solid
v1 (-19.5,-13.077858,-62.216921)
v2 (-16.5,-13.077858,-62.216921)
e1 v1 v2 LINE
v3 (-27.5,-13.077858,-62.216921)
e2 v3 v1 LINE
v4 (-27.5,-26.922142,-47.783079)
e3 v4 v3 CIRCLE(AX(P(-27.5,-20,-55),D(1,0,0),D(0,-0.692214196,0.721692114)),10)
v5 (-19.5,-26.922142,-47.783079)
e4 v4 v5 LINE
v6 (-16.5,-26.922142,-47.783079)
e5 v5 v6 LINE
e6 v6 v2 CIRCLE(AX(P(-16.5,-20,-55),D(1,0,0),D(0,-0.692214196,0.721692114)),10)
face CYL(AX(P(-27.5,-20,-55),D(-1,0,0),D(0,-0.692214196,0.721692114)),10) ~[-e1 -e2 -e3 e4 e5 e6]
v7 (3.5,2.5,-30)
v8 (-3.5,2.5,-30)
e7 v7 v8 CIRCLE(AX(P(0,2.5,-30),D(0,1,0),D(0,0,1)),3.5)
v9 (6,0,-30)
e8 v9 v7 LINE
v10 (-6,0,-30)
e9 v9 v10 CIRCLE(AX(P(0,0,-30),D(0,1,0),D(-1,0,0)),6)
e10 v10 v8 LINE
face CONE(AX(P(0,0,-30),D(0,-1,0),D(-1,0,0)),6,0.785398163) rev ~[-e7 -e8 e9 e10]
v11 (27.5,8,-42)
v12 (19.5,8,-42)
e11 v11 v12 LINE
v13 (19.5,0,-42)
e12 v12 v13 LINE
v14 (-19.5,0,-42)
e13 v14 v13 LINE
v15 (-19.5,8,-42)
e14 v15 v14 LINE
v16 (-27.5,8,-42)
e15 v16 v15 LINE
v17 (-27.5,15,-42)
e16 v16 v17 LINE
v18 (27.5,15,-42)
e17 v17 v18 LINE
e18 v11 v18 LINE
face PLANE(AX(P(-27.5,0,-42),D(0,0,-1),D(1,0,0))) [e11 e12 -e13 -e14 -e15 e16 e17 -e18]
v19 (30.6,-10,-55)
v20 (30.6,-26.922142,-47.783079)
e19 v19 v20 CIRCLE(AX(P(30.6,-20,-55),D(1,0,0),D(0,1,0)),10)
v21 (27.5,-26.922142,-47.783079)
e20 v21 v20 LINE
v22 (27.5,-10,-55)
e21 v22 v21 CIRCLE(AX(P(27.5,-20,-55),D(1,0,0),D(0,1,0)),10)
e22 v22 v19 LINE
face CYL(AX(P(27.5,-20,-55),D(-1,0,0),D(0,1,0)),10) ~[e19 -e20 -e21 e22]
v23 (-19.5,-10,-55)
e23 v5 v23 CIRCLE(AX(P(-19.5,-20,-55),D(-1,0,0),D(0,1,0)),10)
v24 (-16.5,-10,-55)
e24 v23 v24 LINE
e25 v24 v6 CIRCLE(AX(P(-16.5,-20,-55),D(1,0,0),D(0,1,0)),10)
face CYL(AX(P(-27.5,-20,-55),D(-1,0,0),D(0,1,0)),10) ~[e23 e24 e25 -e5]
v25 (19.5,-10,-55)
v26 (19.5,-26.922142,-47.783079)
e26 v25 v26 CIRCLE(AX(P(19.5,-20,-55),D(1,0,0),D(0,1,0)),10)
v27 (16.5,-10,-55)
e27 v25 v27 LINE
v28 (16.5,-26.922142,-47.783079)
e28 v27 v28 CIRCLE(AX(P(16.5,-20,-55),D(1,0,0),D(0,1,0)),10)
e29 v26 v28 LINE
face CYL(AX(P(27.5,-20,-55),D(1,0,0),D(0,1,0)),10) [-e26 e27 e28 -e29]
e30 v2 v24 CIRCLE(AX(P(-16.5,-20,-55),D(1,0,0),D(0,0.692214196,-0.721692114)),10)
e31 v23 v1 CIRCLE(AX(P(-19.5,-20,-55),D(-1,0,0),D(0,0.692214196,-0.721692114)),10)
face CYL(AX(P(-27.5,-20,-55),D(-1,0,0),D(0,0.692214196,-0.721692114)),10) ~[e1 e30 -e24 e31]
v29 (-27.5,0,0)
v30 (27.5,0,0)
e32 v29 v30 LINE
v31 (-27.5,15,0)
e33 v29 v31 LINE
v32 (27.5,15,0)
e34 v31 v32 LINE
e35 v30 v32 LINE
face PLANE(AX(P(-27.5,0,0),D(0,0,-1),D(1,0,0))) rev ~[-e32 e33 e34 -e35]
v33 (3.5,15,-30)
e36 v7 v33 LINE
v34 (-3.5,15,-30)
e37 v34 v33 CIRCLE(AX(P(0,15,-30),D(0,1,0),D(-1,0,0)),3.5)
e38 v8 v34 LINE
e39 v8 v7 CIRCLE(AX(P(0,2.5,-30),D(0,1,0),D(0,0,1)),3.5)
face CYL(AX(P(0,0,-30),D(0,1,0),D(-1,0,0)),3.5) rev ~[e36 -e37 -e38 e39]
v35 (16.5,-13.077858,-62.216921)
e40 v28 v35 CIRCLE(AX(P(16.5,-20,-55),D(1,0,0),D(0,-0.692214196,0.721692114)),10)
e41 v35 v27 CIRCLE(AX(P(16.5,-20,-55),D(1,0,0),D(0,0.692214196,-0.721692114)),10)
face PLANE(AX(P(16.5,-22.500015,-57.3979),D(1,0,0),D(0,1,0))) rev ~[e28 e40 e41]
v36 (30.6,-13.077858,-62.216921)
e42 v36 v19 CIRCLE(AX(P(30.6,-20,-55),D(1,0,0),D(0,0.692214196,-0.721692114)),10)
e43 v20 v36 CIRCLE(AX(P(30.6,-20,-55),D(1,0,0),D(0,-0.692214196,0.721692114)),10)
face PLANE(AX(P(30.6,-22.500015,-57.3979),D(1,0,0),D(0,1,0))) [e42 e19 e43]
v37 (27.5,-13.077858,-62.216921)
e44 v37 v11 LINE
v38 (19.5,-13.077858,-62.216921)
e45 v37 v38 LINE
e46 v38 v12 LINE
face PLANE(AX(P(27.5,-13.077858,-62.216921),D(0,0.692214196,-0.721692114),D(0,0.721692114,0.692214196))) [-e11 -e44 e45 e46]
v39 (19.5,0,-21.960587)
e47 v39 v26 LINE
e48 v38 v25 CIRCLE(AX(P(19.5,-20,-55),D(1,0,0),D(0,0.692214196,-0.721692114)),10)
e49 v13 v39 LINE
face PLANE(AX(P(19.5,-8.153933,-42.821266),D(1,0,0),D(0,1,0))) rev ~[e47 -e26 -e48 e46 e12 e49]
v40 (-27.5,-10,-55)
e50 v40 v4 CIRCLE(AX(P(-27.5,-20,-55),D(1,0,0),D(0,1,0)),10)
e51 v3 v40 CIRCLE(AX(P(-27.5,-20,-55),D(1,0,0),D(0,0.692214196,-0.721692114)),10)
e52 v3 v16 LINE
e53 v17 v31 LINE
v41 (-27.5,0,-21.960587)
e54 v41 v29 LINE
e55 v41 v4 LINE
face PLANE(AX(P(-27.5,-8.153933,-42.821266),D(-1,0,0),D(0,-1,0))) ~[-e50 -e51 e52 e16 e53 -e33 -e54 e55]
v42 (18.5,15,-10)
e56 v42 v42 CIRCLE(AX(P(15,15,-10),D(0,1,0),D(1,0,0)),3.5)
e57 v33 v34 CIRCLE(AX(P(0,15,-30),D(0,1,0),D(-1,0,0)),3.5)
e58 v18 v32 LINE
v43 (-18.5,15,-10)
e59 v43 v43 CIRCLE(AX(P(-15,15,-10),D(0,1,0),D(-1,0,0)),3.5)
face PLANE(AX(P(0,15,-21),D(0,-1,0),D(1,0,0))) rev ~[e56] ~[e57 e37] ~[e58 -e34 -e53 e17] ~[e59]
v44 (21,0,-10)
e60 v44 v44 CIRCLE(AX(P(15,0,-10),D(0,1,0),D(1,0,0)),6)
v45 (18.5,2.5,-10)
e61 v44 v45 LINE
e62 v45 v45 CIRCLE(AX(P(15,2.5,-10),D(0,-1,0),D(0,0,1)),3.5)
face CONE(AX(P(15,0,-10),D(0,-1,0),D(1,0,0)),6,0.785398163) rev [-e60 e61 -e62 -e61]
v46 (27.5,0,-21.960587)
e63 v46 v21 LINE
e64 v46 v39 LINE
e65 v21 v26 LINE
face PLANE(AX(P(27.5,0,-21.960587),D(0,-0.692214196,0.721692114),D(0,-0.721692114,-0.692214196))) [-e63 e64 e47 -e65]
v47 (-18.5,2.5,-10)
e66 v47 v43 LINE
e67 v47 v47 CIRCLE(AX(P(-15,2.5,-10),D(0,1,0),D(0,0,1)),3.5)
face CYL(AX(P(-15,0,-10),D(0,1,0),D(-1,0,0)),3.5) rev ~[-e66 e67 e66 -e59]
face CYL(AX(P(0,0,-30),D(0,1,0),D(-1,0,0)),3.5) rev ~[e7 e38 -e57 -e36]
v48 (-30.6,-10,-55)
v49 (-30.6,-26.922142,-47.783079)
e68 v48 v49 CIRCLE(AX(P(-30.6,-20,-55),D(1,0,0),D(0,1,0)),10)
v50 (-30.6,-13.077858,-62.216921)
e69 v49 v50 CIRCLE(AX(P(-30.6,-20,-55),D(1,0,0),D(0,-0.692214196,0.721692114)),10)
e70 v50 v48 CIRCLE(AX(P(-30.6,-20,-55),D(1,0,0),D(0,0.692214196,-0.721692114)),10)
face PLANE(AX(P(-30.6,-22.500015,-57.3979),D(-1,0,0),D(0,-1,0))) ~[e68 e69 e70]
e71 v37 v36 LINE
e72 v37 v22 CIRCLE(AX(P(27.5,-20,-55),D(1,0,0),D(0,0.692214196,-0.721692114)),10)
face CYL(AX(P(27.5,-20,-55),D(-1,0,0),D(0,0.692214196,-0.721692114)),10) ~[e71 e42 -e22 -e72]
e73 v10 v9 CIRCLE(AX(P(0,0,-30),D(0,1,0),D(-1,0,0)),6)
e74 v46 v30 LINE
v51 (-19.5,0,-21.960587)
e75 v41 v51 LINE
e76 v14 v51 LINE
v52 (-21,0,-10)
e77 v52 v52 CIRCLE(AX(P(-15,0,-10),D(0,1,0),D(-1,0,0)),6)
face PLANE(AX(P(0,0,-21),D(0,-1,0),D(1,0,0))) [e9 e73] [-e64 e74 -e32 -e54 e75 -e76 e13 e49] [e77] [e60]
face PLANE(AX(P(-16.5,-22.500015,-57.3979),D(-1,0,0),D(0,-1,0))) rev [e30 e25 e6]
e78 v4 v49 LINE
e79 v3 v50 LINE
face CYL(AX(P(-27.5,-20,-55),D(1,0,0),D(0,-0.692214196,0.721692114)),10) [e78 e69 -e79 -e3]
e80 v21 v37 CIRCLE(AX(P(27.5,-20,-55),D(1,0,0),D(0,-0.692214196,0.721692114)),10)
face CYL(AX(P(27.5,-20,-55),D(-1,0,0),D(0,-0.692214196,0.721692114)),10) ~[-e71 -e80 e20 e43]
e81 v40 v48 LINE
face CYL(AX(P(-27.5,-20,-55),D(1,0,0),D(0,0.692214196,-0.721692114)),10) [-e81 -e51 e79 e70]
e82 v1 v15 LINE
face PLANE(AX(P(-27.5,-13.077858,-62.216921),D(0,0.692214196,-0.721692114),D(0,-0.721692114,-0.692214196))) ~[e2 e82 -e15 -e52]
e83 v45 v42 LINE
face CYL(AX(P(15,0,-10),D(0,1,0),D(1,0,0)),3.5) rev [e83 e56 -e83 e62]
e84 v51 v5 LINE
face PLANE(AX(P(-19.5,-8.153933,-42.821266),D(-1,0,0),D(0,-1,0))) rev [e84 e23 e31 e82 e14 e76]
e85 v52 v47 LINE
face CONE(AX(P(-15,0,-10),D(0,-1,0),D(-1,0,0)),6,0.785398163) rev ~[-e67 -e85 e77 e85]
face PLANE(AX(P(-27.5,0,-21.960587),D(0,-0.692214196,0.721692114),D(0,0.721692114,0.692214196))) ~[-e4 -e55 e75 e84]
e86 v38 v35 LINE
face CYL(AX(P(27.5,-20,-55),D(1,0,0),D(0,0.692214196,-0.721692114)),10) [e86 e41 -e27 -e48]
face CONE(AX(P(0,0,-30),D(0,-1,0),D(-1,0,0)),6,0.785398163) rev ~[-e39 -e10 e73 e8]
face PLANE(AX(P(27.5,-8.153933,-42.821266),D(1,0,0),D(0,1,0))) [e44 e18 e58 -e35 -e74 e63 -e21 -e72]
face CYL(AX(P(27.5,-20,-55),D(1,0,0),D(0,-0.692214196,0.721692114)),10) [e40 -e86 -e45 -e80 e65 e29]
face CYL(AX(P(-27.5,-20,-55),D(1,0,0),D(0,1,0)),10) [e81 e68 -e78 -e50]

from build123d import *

# Parameters (mm, degrees)
F0_W           = 55
F0_H           = 42
F1_DEPTH       = 15
F3_DEPTH       = 8
F4_DEPTH       = 3.1
F4_DEPTH_BACK  = 11
F6_D           = 7
F6_CSINK_D     = 12
F6_CSINK_ANGLE = 90


# Not quite as in the source:
# - a pattern or mirror of a feature is missing from the dataset's text; its kind, count and spacing are read off the source's solid


with BuildPart() as f1:
    # F0 (on Front) → F1 (new body)
    with BuildSketch(Plane.XZ):
        with Locations((0, -21)):
            Rectangle(F0_W, F0_H)
    extrude(amount=-F1_DEPTH)

    # F2 (on face) → F3 (join)
    with BuildSketch(Plane.YZ.offset(27.5)):
        with BuildLine():
            Line((0, -42), (0, -21.960586854))
            Line((0, -21.960586854), (-26.9221419573, -47.7830788612))
            ThreePointArc((-26.9221419573, -47.7830788612), (-16.0770814164, -45.8015919972), (-10, -55))
            ThreePointArc((-10, -55), (-10.8015919972, -58.9229185836), (-13.0778580427, -62.2169211388))
            Line((-13.0778580427, -62.2169211388), (8, -42))
            Line((8, -42), (0, -42))
        make_face()
        with BuildLine():
            ThreePointArc((-10, -55), (-16.0770814164, -45.8015919972), (-26.9221419573, -47.7830788612))
            Line((-26.9221419573, -47.7830788612), (-13.0778580427, -62.2169211388))
            ThreePointArc((-13.0778580427, -62.2169211388), (-10.8015919972, -58.9229185836), (-10, -55))
        make_face()
    f3 = extrude(amount=-F3_DEPTH)

    # F3_copies: F3 across plane
    add(f3.mirror(Plane(origin=(0, 0, 0), x_dir=(0, 0, -1), z_dir=(-1, 0, 0))))

    # F2 (on face) → F4 (join, two sides)
    with BuildSketch(Plane.YZ.offset(27.5)) as f4_sk:
        with BuildLine():
            Line((-13.0778580427, -62.2169211388), (-26.9221419573, -47.7830788612))
            ThreePointArc((-26.9221419573, -47.7830788612), (-27.2169211388, -61.9221419573), (-13.0778580427, -62.2169211388))
        make_face()
        with BuildLine():
            ThreePointArc((-10, -55), (-16.0770814164, -45.8015919972), (-26.9221419573, -47.7830788612))
            Line((-26.9221419573, -47.7830788612), (-13.0778580427, -62.2169211388))
            ThreePointArc((-13.0778580427, -62.2169211388), (-10.8015919972, -58.9229185836), (-10, -55))
        make_face()
    f4 = extrude(amount=F4_DEPTH) + extrude(f4_sk.sketch, amount=-F4_DEPTH_BACK)

    # F4_copies: F4 across plane
    add(f4.mirror(Plane(origin=(0, 0, 0), x_dir=(0, 0, -1), z_dir=(-1, 0, 0))))

    # F6 (through all)
    with Locations(Plane.XZ):
        with Locations((-15, -10), (0, -30)):
            f6 = CounterSinkHole(F6_D / 2, F6_CSINK_D / 2, counter_sink_angle=F6_CSINK_ANGLE)

    # F6_copies: F6 across plane
    add(f6.mirror(Plane(origin=(0, 0, 0), x_dir=(0, 0, 1), z_dir=(1, 0, 0))), mode=Mode.SUBTRACT)


solid = f1.part
